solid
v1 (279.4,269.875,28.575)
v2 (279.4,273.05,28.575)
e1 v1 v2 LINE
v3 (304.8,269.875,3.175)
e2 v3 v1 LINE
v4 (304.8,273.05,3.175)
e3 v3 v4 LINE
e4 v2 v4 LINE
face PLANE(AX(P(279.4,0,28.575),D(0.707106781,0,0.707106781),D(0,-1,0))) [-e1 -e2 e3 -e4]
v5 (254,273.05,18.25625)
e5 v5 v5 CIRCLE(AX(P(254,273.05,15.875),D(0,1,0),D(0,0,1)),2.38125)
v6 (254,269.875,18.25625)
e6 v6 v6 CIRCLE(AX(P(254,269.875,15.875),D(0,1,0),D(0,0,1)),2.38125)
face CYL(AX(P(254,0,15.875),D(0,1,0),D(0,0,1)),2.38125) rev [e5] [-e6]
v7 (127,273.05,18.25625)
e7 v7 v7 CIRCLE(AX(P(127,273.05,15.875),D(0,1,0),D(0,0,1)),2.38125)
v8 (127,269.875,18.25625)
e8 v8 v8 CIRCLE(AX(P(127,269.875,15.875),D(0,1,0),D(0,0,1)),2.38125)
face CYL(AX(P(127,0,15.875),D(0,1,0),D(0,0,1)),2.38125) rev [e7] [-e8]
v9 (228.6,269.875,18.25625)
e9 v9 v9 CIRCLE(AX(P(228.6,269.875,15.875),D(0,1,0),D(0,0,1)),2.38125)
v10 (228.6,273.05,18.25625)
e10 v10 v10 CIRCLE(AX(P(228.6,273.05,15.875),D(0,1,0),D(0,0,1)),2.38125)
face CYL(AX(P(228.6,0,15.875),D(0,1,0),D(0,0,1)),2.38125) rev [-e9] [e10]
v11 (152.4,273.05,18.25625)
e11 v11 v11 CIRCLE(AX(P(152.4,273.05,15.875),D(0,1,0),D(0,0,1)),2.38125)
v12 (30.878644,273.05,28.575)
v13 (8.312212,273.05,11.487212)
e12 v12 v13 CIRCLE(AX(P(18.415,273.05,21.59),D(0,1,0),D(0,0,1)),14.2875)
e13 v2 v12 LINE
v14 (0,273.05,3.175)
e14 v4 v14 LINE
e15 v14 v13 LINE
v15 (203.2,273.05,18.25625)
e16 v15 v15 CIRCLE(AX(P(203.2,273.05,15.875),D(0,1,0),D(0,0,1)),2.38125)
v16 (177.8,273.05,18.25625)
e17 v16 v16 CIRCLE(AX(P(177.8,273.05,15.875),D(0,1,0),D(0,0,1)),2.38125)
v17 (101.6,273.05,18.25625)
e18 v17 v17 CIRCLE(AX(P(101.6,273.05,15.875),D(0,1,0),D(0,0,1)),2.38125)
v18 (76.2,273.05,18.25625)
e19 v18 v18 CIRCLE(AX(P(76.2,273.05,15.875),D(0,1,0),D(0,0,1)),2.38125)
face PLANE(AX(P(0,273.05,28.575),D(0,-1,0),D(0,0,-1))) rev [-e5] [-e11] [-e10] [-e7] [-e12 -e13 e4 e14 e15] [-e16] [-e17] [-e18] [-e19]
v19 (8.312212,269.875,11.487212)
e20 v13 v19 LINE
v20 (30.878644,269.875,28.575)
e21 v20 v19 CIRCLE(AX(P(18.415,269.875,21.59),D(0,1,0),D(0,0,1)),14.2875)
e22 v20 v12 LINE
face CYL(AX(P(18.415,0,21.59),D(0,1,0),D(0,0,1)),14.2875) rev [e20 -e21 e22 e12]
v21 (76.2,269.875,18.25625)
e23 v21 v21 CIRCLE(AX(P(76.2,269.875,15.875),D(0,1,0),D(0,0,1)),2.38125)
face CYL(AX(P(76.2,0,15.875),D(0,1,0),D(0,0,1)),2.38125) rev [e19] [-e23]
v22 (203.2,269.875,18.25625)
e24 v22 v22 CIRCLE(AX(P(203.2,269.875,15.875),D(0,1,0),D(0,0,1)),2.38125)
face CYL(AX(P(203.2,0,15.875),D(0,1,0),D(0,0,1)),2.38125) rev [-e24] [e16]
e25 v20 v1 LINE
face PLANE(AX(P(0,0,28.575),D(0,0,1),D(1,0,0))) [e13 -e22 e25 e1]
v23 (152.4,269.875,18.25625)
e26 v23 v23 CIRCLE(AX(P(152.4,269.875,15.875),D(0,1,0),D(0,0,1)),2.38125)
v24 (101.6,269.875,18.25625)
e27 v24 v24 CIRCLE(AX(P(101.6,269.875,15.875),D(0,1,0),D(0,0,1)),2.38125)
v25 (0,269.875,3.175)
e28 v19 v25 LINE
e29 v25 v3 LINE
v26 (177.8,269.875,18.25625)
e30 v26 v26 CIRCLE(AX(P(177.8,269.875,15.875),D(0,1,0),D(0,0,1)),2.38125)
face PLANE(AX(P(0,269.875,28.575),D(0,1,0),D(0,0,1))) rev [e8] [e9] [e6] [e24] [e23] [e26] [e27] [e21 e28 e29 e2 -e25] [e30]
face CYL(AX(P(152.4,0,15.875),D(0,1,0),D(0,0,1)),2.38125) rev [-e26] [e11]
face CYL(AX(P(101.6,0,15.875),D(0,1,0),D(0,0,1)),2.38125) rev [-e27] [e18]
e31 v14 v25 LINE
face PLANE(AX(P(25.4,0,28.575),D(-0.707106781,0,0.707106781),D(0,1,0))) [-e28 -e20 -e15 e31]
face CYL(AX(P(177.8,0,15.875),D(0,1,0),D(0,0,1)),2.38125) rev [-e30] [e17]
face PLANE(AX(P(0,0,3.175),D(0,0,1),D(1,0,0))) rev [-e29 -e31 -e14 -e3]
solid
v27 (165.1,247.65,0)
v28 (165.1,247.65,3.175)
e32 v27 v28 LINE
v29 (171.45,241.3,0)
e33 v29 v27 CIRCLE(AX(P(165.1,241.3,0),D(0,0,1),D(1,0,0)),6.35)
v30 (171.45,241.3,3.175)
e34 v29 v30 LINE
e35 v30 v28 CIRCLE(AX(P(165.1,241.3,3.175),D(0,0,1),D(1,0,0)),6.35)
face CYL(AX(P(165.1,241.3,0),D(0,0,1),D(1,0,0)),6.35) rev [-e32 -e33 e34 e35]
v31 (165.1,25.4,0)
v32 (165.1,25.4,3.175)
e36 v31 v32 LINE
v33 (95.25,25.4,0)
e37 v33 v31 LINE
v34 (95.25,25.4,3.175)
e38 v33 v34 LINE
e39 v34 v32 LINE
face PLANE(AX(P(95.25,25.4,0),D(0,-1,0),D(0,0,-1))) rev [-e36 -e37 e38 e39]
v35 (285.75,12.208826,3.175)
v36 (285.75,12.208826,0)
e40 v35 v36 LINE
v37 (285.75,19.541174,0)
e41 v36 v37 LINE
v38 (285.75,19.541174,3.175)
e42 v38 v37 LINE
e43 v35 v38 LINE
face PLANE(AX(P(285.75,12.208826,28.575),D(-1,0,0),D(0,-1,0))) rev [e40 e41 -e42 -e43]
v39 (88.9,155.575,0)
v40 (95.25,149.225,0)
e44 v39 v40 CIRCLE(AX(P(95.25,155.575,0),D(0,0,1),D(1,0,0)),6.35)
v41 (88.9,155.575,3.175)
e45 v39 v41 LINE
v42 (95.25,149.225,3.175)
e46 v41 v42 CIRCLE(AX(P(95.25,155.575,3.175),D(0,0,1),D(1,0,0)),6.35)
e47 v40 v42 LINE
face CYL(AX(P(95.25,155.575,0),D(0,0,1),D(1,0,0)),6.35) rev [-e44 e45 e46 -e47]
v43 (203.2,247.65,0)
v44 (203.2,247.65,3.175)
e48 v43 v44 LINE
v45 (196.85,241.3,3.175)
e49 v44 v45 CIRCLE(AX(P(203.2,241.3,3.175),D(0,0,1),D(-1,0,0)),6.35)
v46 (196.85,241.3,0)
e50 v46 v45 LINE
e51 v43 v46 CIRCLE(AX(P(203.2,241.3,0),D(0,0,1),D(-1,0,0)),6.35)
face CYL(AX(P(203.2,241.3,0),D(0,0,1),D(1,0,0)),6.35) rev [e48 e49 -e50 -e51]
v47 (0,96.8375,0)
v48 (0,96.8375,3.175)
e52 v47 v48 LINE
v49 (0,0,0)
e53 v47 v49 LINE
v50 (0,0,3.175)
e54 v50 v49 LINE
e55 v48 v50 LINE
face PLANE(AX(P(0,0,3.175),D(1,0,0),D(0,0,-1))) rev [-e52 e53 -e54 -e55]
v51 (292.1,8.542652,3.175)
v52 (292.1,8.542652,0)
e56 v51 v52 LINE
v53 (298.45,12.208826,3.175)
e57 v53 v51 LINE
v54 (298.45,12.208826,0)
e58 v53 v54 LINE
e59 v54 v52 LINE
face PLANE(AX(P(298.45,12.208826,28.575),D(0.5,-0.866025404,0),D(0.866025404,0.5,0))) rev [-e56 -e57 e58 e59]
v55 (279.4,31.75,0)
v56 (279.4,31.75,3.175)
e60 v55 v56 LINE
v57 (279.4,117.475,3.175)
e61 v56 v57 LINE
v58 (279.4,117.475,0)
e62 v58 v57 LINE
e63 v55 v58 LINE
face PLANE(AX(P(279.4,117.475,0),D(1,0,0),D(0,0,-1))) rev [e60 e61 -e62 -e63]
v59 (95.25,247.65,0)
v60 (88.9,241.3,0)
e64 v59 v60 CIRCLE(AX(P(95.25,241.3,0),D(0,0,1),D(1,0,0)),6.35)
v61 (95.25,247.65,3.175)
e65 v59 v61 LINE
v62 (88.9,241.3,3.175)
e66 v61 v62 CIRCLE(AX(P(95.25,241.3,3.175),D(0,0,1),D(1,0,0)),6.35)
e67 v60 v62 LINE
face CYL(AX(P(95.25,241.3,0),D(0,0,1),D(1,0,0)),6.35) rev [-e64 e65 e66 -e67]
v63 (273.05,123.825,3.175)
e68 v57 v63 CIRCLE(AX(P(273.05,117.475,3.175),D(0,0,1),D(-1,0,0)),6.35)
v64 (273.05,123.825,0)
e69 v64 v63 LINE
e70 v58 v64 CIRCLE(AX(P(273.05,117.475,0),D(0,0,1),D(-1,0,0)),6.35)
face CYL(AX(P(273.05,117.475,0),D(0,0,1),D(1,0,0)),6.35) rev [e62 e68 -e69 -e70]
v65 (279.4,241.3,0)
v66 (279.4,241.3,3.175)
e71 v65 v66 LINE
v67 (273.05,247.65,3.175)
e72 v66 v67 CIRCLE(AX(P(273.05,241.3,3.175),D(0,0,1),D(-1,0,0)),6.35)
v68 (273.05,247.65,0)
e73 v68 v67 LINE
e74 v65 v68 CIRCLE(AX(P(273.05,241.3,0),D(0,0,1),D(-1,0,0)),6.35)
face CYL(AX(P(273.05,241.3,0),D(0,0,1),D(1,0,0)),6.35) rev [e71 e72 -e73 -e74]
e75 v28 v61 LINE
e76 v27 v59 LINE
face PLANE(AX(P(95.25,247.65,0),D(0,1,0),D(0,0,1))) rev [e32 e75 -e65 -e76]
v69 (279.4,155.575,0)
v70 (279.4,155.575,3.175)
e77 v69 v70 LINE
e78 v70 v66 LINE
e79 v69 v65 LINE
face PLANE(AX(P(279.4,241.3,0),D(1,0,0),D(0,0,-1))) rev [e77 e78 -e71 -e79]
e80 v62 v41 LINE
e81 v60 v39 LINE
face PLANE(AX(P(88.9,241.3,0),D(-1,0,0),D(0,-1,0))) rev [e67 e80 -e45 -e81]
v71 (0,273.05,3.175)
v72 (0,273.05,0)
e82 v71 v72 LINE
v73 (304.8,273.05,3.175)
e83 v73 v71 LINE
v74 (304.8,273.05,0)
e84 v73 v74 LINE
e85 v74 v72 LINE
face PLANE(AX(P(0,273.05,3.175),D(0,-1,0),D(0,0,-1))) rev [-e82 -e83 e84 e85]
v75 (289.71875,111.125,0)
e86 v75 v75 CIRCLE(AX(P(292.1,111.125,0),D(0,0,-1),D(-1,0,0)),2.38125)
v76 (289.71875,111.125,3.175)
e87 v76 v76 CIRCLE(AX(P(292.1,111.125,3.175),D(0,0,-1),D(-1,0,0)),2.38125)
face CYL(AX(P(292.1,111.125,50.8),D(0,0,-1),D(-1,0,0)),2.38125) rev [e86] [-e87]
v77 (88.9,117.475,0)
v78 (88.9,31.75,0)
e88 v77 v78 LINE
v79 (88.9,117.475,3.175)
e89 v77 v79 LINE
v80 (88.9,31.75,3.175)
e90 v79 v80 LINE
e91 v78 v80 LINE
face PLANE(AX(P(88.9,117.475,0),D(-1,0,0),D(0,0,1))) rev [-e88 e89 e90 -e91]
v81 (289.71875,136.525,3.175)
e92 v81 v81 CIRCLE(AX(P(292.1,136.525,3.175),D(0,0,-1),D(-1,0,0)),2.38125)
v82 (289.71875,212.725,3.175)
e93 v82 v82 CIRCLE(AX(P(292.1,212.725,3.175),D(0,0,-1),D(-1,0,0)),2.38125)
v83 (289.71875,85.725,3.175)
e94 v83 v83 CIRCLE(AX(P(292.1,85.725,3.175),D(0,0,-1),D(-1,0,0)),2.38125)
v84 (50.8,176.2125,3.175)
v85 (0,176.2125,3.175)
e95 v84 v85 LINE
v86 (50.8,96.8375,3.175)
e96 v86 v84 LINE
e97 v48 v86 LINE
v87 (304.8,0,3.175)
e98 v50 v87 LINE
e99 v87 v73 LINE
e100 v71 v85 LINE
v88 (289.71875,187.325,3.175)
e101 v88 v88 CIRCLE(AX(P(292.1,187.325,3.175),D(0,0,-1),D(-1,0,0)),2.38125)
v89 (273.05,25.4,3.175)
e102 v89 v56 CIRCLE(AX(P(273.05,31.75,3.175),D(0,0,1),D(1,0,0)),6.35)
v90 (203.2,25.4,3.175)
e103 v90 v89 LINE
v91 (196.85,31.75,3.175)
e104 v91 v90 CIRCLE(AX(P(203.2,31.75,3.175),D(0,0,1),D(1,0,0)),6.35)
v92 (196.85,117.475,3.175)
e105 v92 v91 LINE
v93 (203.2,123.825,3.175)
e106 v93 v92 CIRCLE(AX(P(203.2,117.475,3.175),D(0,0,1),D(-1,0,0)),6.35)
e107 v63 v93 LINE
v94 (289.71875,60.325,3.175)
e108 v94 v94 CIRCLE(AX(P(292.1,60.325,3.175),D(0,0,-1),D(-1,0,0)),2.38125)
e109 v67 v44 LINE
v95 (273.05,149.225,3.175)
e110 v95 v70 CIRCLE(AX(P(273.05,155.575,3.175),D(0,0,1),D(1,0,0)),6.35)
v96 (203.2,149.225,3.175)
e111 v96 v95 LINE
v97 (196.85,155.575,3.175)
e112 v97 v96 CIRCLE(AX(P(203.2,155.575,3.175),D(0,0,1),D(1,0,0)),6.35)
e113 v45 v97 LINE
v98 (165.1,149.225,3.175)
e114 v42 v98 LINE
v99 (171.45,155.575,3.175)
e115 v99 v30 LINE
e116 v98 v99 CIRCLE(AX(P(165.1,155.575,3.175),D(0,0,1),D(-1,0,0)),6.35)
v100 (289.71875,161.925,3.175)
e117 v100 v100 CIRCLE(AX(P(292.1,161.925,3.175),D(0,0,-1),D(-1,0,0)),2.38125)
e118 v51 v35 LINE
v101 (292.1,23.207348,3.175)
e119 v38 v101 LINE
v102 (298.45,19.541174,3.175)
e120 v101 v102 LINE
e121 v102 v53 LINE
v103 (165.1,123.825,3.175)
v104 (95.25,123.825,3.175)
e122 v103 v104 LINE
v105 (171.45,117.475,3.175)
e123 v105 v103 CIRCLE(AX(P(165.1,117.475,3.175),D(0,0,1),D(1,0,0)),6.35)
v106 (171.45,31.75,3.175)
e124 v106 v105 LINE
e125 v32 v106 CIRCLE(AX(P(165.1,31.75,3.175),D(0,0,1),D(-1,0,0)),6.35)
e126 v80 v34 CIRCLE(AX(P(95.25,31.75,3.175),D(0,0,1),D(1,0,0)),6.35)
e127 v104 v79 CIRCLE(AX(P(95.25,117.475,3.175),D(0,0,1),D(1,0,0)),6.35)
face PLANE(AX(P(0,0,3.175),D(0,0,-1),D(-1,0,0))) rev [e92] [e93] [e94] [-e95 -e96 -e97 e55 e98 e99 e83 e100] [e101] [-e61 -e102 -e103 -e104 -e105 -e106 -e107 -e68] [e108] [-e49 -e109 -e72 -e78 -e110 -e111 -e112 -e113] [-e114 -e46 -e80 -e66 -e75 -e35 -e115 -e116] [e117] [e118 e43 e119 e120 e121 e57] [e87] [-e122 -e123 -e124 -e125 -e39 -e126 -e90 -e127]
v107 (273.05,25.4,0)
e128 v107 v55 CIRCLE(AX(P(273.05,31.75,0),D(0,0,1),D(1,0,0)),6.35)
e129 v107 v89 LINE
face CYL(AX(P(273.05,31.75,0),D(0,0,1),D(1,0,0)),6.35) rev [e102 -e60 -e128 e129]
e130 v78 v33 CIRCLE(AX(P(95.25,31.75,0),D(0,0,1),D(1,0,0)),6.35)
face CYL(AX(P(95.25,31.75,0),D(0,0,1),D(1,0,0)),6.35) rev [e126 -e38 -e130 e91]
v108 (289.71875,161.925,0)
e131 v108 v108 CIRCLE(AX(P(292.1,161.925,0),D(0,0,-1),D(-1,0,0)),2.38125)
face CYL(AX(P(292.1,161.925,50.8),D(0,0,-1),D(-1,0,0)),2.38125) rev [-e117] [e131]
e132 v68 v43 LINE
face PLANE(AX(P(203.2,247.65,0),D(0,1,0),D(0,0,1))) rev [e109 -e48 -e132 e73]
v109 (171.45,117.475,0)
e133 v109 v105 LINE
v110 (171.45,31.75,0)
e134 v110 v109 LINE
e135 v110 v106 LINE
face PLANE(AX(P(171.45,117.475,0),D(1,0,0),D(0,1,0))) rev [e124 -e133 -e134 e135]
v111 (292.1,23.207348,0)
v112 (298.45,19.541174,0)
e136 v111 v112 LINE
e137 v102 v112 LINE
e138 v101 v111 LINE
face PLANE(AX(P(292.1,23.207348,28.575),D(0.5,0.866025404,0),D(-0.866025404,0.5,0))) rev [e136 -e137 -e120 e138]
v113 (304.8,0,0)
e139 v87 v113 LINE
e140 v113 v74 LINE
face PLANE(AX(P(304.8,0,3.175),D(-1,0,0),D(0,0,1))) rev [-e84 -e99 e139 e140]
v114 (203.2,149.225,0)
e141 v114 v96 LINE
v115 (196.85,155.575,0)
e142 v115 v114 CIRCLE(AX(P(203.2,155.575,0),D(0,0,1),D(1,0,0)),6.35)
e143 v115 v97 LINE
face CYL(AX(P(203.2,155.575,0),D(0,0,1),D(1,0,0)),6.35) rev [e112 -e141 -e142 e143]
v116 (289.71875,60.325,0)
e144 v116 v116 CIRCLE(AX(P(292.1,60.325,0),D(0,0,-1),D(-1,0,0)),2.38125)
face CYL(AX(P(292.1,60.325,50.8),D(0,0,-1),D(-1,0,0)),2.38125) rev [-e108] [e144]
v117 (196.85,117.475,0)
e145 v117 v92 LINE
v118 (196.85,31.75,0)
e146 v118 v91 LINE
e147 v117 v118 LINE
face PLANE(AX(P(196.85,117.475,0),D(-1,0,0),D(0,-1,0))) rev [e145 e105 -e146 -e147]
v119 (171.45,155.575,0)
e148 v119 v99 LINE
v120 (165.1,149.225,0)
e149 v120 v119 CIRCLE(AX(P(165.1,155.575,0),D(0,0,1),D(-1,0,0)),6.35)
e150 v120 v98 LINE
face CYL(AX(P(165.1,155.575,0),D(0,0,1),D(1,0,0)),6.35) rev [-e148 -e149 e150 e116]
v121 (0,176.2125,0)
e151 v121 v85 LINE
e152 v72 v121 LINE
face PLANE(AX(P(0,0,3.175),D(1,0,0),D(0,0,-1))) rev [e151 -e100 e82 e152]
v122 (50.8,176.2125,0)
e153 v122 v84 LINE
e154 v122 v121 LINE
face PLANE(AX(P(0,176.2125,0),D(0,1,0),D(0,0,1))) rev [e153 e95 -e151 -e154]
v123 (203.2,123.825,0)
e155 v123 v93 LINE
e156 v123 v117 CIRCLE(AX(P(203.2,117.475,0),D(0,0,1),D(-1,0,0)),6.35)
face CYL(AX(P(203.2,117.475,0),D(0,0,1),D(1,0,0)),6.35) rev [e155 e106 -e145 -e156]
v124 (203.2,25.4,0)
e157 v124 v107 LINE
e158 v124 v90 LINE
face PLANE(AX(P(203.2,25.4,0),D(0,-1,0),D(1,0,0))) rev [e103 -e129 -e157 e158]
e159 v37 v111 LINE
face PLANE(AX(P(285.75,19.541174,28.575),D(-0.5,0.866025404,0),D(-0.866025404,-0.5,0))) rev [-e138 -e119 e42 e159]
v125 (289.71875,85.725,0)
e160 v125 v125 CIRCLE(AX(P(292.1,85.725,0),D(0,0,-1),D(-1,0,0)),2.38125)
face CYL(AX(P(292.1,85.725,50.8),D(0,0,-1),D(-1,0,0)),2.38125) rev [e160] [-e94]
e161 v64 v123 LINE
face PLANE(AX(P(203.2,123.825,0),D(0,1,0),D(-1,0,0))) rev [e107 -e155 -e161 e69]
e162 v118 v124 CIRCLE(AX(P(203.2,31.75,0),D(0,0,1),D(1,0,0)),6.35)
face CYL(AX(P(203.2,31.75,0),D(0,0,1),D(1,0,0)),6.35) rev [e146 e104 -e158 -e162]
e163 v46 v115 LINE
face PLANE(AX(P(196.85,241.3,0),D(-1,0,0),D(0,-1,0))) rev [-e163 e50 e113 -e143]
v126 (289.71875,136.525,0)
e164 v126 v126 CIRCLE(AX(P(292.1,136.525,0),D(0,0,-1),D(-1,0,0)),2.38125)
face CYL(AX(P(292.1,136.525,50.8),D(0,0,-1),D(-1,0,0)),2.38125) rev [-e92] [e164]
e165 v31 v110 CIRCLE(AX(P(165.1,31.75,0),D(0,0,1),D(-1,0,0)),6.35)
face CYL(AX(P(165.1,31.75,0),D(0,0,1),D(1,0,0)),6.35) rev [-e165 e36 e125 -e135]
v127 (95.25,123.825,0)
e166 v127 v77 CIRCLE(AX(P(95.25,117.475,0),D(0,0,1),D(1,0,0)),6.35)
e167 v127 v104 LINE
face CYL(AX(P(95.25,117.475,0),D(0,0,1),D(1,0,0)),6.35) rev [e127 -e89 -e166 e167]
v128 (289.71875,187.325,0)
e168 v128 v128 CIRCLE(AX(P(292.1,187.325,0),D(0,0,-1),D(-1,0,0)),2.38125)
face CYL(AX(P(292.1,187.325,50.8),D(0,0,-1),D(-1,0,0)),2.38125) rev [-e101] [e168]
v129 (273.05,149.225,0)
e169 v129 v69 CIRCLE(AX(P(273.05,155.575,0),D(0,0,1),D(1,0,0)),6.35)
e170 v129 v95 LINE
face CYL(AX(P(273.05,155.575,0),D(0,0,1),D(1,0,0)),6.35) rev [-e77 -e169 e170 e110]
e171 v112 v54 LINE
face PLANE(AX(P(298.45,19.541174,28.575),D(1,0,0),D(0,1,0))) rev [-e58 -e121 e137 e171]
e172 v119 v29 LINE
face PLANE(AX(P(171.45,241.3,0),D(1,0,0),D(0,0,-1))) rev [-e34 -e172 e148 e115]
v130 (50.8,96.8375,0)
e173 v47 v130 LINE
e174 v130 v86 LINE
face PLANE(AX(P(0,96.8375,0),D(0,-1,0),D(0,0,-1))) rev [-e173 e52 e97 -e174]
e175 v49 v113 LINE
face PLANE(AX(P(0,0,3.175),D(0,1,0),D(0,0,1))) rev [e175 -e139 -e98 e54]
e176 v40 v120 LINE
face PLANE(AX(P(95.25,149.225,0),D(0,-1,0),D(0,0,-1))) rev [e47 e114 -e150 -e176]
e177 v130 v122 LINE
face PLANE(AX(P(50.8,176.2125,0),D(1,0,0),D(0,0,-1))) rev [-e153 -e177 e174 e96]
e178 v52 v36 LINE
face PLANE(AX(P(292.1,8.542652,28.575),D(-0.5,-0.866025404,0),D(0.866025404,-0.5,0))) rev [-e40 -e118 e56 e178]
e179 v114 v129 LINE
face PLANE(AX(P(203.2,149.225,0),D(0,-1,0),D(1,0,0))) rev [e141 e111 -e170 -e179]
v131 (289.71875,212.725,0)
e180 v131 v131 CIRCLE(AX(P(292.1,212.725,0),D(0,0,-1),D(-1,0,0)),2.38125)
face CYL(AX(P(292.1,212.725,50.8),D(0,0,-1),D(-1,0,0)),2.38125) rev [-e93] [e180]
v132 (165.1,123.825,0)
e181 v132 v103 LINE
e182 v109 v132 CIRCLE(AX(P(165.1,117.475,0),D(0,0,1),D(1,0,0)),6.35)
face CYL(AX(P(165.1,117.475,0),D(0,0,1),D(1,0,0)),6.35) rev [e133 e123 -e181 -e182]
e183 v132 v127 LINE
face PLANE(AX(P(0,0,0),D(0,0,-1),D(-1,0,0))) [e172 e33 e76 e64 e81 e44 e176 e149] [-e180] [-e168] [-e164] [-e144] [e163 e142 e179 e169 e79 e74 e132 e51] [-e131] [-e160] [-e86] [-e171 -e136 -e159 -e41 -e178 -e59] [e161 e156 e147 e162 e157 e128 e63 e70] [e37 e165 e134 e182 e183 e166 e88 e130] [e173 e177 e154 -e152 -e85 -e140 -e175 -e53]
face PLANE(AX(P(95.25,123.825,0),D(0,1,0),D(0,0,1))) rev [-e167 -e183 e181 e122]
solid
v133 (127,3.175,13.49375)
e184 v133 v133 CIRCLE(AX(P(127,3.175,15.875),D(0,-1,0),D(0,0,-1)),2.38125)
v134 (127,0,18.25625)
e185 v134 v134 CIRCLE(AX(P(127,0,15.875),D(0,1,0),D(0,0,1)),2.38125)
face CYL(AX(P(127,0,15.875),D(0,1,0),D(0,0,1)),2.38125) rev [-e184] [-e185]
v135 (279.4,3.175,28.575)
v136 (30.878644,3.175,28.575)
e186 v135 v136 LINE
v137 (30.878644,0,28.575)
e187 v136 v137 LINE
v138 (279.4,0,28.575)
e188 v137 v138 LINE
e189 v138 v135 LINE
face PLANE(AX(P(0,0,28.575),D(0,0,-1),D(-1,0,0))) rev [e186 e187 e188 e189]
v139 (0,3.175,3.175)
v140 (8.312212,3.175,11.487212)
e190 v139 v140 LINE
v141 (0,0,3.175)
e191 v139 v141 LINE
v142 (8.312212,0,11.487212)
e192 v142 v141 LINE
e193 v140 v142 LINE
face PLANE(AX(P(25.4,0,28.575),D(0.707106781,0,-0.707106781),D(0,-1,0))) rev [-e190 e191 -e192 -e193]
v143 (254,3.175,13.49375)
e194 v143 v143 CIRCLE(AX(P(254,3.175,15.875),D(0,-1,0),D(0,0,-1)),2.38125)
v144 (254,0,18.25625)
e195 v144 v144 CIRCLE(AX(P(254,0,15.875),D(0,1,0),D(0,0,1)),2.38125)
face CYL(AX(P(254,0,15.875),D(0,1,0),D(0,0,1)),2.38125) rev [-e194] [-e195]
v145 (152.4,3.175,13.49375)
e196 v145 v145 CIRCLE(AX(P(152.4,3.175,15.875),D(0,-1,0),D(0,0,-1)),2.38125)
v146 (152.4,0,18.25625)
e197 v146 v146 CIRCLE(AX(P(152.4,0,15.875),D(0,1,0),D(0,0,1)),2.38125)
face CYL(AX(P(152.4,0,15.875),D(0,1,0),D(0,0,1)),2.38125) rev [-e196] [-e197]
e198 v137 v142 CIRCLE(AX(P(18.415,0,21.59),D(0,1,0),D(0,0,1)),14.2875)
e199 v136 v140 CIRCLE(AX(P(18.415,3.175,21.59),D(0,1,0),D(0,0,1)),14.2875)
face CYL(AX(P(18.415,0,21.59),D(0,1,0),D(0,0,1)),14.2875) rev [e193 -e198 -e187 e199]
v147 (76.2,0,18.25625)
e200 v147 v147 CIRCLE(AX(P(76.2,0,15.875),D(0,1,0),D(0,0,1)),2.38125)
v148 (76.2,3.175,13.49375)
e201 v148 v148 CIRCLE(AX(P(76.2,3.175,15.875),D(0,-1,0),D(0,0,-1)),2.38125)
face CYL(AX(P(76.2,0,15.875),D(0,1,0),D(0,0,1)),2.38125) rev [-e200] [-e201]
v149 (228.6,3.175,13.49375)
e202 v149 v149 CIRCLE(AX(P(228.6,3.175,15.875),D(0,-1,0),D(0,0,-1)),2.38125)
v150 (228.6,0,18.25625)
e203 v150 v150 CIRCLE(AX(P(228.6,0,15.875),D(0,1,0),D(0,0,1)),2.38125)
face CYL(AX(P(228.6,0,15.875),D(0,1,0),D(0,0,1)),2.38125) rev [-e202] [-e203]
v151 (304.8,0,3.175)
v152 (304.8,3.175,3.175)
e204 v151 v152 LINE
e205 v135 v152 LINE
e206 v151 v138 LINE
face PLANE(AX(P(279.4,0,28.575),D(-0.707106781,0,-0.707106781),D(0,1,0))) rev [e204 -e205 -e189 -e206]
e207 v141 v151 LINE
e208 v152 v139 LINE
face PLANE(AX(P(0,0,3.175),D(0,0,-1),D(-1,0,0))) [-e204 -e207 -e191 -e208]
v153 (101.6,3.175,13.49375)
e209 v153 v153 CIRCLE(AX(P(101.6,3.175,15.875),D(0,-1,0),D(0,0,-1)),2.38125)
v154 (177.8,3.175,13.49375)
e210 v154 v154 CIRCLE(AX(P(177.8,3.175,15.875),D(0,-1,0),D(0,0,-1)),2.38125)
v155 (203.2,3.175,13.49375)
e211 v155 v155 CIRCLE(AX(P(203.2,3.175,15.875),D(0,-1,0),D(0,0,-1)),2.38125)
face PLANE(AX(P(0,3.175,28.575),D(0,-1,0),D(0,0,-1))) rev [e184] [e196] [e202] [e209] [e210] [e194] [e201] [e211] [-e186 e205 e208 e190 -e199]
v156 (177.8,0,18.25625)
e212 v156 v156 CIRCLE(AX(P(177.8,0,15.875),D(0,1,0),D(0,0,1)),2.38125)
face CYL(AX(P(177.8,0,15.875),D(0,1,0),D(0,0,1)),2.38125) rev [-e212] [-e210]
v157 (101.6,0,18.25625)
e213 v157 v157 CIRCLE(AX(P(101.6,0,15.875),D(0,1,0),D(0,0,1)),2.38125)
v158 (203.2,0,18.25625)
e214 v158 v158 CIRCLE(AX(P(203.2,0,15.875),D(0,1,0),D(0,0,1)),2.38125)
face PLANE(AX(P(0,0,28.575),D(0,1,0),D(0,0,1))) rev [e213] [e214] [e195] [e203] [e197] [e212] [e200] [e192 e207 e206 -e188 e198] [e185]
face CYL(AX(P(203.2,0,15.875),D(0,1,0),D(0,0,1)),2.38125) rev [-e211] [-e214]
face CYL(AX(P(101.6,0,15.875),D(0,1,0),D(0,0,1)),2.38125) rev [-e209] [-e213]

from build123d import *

# Parameters (mm, degrees)
SKETCH1_W           = 304.8
SKETCH1_H           = 273.05
BOSS_EXTRUDE1_DEPTH = 3.175
SKETCH2_W           = 50.8
SKETCH2_H           = 79.375
CUT_EXTRUDE1_DEPTH  = 3.175
SKETCH5_W           = 304.8
SKETCH5_H           = 3.175
BASE_FLANGE1_DEPTH  = 25.4
CHAMFER1_SIZE       = 25.4
SKETCH10_W          = 304.8
SKETCH10_H          = 3.175
BASE_FLANGE2_DEPTH  = 25.4
CHAMFER2_SIZE       = 25.4
SKETCH13_R          = 14.2875
CUT_EXTRUDE4_DEPTH  = 411.214423351
SKETCH19_R          = 2.38125
CUT_EXTRUDE7_DEPTH  = 411.214423351
SKETCH20_R          = 2.38125
CUT_EXTRUDE8_DEPTH  = 50.8
SKETCH21_R          = 14.2875
CUT_EXTRUDE9_DEPTH  = 3.175
CUT_EXTRUDE10_DEPTH = 411.214423351


# Sheet-metal steps are written as plain solids
with BuildPart() as part:
    # Sketch1 → Boss-Extrude1 (new body)
    with BuildSketch(Plane.XY):
        with Locations((152.4, 136.525)):
            Rectangle(SKETCH1_W, SKETCH1_H)
    extrude(amount=BOSS_EXTRUDE1_DEPTH)

    # Sketch2 → Cut-Extrude1 (cut)
    with BuildSketch(Plane.XY.offset(3.175)):
        with BuildLine():
            Line((95.25, 247.65), (165.1, 247.65))
            ThreePointArc((165.1, 247.65), (169.590128061, 245.790128061), (171.45, 241.3))
            Line((171.45, 241.3), (171.45, 155.575))
            ThreePointArc((171.45, 155.575), (169.590128061, 151.084871939), (165.1, 149.225))
            Line((165.1, 149.225), (95.25, 149.225))
            ThreePointArc((95.25, 149.225), (90.759871939, 151.084871939), (88.9, 155.575))
            Line((88.9, 155.575), (88.9, 241.3))
            ThreePointArc((88.9, 241.3), (90.759871939, 245.790128061), (95.25, 247.65))
        make_face()
        with BuildLine():
            Line((279.4, 241.3), (279.4, 155.575))
            ThreePointArc((279.4, 155.575), (277.540128061, 151.084871939), (273.05, 149.225))
            Line((273.05, 149.225), (203.2, 149.225))
            ThreePointArc((203.2, 149.225), (198.709871939, 151.084871939), (196.85, 155.575))
            Line((196.85, 155.575), (196.85, 241.3))
            ThreePointArc((196.85, 241.3), (198.709871939, 245.790128061), (203.2, 247.65))
            Line((203.2, 247.65), (273.05, 247.65))
            ThreePointArc((273.05, 247.65), (277.540128061, 245.790128061), (279.4, 241.3))
        make_face()
        with BuildLine():
            Line((95.25, 123.825), (165.1, 123.825))
            ThreePointArc((165.1, 123.825), (169.590128061, 121.965128061), (171.45, 117.475))
            Line((171.45, 117.475), (171.45, 31.75))
            ThreePointArc((171.45, 31.75), (169.590128061, 27.259871939), (165.1, 25.4))
            Line((165.1, 25.4), (95.25, 25.4))
            ThreePointArc((95.25, 25.4), (90.759871939, 27.259871939), (88.9, 31.75))
            Line((88.9, 31.75), (88.9, 117.475))
            ThreePointArc((88.9, 117.475), (90.759871939, 121.965128061), (95.25, 123.825))
        make_face()
        with BuildLine():
            Line((279.4, 117.475), (279.4, 31.75))
            ThreePointArc((279.4, 31.75), (277.540128061, 27.259871939), (273.05, 25.4))
            Line((273.05, 25.4), (203.2, 25.4))
            ThreePointArc((203.2, 25.4), (198.709871939, 27.259871939), (196.85, 31.75))
            Line((196.85, 31.75), (196.85, 117.475))
            ThreePointArc((196.85, 117.475), (198.709871939, 121.965128061), (203.2, 123.825))
            Line((203.2, 123.825), (273.05, 123.825))
            ThreePointArc((273.05, 123.825), (277.540128061, 121.965128061), (279.4, 117.475))
        make_face()
        with Locations((25.4, 136.525)):
            Rectangle(SKETCH2_W, SKETCH2_H)
    extrude(amount=-CUT_EXTRUDE1_DEPTH, mode=Mode.SUBTRACT)

    # Sketch20 → Cut-Extrude8 (cut)
    with BuildSketch(Plane(origin=(0, 0, 0), x_dir=(-1, 0, 0), z_dir=(0, 0, -1))):
        with Locations((-292.1, 136.525)):
            Circle(SKETCH20_R)
        with Locations((-292.1, 161.925)):
            Circle(SKETCH20_R)
        with Locations((-292.1, 187.325)):
            Circle(SKETCH20_R)
        with Locations((-292.1, 212.725)):
            Circle(SKETCH20_R)
        with Locations((-292.1, 111.125)):
            Circle(SKETCH20_R)
        with Locations((-292.1, 85.725)):
            Circle(SKETCH20_R)
        with Locations((-292.1, 60.325)):
            Circle(SKETCH20_R)
    extrude(amount=-CUT_EXTRUDE8_DEPTH, mode=Mode.SUBTRACT)

    # Sketch23 → Cut-Extrude10 (cut, through all)
    with BuildSketch(Plane(origin=(0, 0, 0), x_dir=(-1, 0, 0), z_dir=(0, 0, -1))):
        Polygon((-292.1, 23.207348419), (-298.45, 19.541174209), (-298.45, 12.208825791), (-292.1, 8.542651581), (-285.75, 12.208825791), (-285.75, 19.541174209), align=None)
    extrude(amount=-CUT_EXTRUDE10_DEPTH, mode=Mode.SUBTRACT)


with BuildPart() as body_2:
    # Sketch5 → Base-Flange1 (new body)
    with BuildSketch(Plane.XY.offset(3.175)):
        with Locations((152.4, 271.4625)):
            Rectangle(SKETCH5_W, SKETCH5_H)
    extrude(amount=BASE_FLANGE1_DEPTH)

    # Chamfer1
    chamfer1_edges = [body_2.edges().sort_by_distance(p)[0] for p in [
        (0, 271.4625, 28.575),
        (304.8, 271.4625, 28.575),
    ]]
    chamfer(chamfer1_edges, length=CHAMFER1_SIZE - 0.0001)  # a hair under: the kernel refuses the full size

    # Sketch13 → Cut-Extrude4 (cut, through all)
    with BuildSketch(Plane(origin=(0, 273.05, 0), x_dir=(1, 0, 0), z_dir=(0, 1, 0))):
        with Locations((18.415, -21.59)):
            Circle(SKETCH13_R)
    extrude(amount=-CUT_EXTRUDE4_DEPTH, mode=Mode.SUBTRACT)


with BuildPart() as body_3:
    # Sketch10 → Base-Flange2 (new body)
    with BuildSketch(Plane.XY.offset(3.175)):
        with Locations((152.4, 1.5875)):
            Rectangle(SKETCH10_W, SKETCH10_H)
    extrude(amount=BASE_FLANGE2_DEPTH)

    # Chamfer2
    chamfer2_edges = [body_3.edges().sort_by_distance(p)[0] for p in [
        (0, 1.5875, 28.575),
        (304.8, 1.5875, 28.575),
    ]]
    chamfer(chamfer2_edges, length=CHAMFER2_SIZE - 0.0001)  # a hair under: the kernel refuses the full size


with BuildPart() as cut_extrude7_tool:
    # Sketch19 → Cut-Extrude7 (new, through all)
    with BuildSketch(Plane(origin=(0, 273.05, 0), x_dir=(1, 0, 0), z_dir=(0, 1, 0))):
        with Locations(Location((76.2, -15.875, 0), (0, 0, 270))):
            Circle(SKETCH19_R)
        with Locations(Location((101.6, -15.875, 0), (0, 0, 270))):
            Circle(SKETCH19_R)
        with Locations(Location((127, -15.875, 0), (0, 0, 270))):
            Circle(SKETCH19_R)
        with Locations(Location((152.4, -15.875, 0), (0, 0, 270))):
            Circle(SKETCH19_R)
        with Locations(Location((177.8, -15.875, 0), (0, 0, 270))):
            Circle(SKETCH19_R)
        with Locations(Location((203.2, -15.875, 0), (0, 0, 270))):
            Circle(SKETCH19_R)
        with Locations(Location((228.6, -15.875, 0), (0, 0, 270))):
            Circle(SKETCH19_R)
        with Locations(Location((254, -15.875, 0), (0, 0, 270))):
            Circle(SKETCH19_R)
    extrude(amount=-CUT_EXTRUDE7_DEPTH)


with BuildPart() as body_2_1:
    add(body_2.part)

    # Cut-Extrude7: cut by cut_extrude7_tool
    add(cut_extrude7_tool.part, mode=Mode.SUBTRACT)


with BuildPart() as body_3_1:
    add(body_3.part)

    # Cut-Extrude7: cut by cut_extrude7_tool
    add(cut_extrude7_tool.part, mode=Mode.SUBTRACT)

    # Sketch21 → Cut-Extrude9 (cut)
    with BuildSketch(Plane(origin=(0, 3.175, 0), x_dir=(1, 0, 0), z_dir=(0, 1, 0))):
        with Locations((18.415, -21.59)):
            Circle(SKETCH21_R)
    extrude(amount=-CUT_EXTRUDE9_DEPTH, mode=Mode.SUBTRACT)


solid = Compound([part.part, body_2_1.part, body_3_1.part])
